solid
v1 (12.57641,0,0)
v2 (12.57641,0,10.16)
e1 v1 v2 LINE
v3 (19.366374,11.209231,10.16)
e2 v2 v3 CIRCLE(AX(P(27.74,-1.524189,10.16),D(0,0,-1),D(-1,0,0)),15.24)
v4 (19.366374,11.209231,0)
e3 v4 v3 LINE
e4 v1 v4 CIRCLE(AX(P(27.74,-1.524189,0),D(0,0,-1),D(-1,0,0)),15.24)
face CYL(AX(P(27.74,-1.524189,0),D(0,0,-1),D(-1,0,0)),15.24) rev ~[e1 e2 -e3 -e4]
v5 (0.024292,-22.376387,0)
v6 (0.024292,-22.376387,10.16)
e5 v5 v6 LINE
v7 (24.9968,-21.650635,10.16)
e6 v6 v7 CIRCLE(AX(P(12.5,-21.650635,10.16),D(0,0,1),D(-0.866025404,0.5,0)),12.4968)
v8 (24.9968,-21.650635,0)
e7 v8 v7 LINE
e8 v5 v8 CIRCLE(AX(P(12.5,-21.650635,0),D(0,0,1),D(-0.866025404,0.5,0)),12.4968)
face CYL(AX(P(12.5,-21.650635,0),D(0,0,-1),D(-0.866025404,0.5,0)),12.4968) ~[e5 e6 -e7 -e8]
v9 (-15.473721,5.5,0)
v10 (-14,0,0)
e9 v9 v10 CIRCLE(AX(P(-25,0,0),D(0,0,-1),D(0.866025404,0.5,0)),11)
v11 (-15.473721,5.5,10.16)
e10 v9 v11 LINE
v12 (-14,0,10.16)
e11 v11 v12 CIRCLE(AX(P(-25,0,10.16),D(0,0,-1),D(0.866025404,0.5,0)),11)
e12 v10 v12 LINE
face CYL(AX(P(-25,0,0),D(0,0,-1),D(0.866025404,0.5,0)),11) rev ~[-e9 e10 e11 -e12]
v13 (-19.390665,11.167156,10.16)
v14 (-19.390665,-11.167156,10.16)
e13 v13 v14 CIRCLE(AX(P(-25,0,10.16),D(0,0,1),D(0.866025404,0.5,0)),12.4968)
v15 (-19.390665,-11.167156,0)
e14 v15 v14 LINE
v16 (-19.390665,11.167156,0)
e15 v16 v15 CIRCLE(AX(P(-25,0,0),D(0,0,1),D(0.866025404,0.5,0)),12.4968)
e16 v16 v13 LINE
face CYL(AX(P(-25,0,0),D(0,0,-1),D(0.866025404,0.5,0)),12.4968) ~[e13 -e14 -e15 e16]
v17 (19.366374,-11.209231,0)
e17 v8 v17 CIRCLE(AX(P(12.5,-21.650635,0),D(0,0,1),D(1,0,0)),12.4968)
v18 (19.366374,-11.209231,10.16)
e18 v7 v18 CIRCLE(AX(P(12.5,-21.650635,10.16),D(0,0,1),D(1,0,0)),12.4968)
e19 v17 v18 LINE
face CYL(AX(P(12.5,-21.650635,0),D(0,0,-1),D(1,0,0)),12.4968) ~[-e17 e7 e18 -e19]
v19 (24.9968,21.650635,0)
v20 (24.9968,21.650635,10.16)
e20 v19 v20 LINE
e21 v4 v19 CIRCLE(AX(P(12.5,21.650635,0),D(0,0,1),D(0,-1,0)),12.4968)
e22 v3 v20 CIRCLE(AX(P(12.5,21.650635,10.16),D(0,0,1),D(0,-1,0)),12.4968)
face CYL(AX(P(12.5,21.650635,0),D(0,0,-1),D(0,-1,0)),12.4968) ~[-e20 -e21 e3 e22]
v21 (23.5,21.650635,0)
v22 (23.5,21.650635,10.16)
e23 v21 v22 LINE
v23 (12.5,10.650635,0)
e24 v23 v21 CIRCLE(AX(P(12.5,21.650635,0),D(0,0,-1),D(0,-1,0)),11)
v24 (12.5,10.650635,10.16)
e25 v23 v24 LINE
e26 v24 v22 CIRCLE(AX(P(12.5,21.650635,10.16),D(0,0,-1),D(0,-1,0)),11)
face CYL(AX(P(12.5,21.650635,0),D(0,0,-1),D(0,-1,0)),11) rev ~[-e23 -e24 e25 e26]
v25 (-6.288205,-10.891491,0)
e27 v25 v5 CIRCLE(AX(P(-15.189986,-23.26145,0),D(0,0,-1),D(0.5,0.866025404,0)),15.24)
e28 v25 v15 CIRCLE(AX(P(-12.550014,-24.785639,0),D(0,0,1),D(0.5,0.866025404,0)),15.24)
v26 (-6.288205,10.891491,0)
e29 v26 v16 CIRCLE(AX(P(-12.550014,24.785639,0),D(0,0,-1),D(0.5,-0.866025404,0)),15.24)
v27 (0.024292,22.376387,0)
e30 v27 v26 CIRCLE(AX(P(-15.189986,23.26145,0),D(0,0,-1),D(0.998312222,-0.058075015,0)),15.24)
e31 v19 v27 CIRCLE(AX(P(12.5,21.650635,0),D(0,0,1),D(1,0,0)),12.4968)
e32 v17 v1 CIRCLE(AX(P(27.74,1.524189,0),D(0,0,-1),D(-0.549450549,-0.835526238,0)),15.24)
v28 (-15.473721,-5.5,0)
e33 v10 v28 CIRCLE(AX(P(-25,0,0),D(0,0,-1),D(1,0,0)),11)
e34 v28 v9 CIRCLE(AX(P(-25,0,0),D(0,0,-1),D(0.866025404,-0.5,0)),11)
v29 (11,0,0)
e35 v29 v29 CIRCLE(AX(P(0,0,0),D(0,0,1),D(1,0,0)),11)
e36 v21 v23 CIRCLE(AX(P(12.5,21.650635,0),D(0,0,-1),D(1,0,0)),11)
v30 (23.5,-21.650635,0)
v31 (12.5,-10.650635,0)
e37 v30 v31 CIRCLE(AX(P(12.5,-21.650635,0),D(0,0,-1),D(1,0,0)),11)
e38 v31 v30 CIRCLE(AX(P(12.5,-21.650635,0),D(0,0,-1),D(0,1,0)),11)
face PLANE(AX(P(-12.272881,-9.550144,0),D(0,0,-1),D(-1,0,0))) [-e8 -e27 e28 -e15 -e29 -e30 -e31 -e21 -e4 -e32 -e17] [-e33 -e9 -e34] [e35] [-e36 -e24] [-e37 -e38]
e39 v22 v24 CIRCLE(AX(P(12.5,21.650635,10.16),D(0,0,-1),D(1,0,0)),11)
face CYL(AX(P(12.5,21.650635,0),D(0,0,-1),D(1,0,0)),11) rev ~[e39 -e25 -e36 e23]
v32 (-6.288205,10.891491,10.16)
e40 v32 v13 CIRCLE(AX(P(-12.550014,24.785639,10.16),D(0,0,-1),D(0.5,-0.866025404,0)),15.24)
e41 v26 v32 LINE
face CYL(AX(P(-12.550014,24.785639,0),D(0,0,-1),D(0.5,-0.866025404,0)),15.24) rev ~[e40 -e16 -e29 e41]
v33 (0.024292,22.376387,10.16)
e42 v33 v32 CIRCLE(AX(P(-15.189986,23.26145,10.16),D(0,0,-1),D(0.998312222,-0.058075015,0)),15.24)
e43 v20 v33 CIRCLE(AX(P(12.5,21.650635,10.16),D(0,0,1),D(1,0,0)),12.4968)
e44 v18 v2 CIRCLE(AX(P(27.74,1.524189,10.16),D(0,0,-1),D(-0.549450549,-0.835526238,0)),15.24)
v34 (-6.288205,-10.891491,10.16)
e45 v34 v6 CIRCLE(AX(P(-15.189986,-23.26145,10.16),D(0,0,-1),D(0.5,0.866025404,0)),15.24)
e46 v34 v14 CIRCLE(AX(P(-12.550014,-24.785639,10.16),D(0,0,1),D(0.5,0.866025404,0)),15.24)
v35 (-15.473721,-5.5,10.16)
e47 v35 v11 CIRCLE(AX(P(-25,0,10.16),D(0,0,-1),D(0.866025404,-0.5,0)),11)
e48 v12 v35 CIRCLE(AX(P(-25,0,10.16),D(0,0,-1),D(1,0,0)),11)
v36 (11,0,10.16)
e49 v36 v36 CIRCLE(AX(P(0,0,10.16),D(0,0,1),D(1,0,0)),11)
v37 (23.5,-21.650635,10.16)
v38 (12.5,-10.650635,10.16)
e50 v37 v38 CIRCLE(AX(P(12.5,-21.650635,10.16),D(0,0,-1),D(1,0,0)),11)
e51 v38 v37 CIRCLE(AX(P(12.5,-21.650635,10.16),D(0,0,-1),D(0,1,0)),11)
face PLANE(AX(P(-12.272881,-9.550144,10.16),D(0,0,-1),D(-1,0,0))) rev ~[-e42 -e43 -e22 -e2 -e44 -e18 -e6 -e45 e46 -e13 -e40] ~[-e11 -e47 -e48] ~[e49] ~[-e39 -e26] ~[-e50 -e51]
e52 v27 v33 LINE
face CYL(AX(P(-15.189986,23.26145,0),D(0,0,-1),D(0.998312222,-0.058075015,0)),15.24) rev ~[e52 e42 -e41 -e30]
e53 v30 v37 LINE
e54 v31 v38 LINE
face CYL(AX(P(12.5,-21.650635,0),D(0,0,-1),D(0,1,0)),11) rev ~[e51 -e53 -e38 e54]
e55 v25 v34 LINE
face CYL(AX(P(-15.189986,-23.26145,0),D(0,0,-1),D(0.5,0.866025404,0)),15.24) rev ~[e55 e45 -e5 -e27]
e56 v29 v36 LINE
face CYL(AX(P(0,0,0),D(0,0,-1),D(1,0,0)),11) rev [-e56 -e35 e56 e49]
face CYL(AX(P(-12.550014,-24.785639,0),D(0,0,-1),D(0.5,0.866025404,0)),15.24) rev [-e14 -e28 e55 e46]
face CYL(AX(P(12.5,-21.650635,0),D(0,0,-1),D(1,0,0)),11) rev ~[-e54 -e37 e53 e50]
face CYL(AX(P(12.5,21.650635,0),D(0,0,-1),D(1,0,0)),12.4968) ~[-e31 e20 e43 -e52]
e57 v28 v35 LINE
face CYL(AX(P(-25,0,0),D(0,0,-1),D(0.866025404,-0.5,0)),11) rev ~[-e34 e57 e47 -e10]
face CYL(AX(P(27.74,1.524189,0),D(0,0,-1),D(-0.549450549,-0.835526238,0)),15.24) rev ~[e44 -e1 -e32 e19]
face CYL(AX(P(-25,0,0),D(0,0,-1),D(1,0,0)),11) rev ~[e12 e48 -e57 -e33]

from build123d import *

# Parameters (mm, degrees)
F0_R        = 11
F1_DEPTH    = 10.16
F2_T1_DEPTH = 10.16


# Not quite as in the source:
# - a fillet or chamfer that OpenCascade refuses, or shapes differently, is made with other operations: its cross-section is extruded or revolved along the edge and cut away or added


with BuildPart() as f1:
    # F0 (on Top) → F1 (new body)
    with BuildSketch(Plane.XY):
        with BuildLine():
            ThreePointArc((-6.2500001721, -10.8253174479), (-12.5, 3.1e-08), (-6.2500001185, 10.8253174789))
            Line((-6.2500001185, 10.8253174789), (-14.177453734, 6.2484))
            ThreePointArc((-14.177453734, 6.2484), (-12.929018134, 3.2344098428), (-12.5032, 0))
            ThreePointArc((-12.5032, 0), (-12.929018134, -3.2344098428), (-14.177453734, -6.2484))
            Line((-14.177453734, -6.2484), (-6.2500001721, -10.8253174479))
        make_face()
        with BuildLine():
            Line((-15.4737205584, 5.5), (-14.177453734, 6.2484))
            ThreePointArc((-14.177453734, 6.2484), (-37.4968, 0), (-14.177453734, -6.2484))
            Line((-14.177453734, -6.2484), (-15.4737205584, -5.5))
            ThreePointArc((-15.4737205584, -5.5), (-36, 0), (-15.4737205584, 5.5))
        make_face()
        with BuildLine():
            Line((12.5, -9.1538350946), (12.5, 0))
            ThreePointArc((12.5, 0), (6.2499999139, -10.825317597), (-6.2500001721, -10.8253174479))
            Line((-6.2500001721, -10.8253174479), (1.677453734, -15.4022350946))
            ThreePointArc((1.677453734, -15.4022350946), (6.2516, -10.8280888286), (12.5, -9.1538350946))
        make_face()
        with BuildLine():
            ThreePointArc((24.9968, -21.6506350946), (21.3365720231, -12.8140630715), (12.5, -9.1538350946))
            Line((12.5, -9.1538350946), (12.5, -10.6506350946))
            ThreePointArc((12.5, -10.6506350946), (20.2781745931, -13.8724605016), (23.5, -21.6506350946))
            ThreePointArc((23.5, -21.6506350946), (9.6529905039, -32.2758191838), (2.9737205584, -16.1506350946))
            Line((2.9737205584, -16.1506350946), (1.677453734, -15.4022350946))
            ThreePointArc((1.677453734, -15.4022350946), (9.2655901572, -33.7216169606), (24.9968, -21.6506350946))
        make_face()
        with BuildLine():
            Line((12.5, -10.6506350946), (12.5, -9.1538350946))
            ThreePointArc((12.5, -9.1538350946), (6.2516, -10.8280888286), (1.677453734, -15.4022350946))
            Line((1.677453734, -15.4022350946), (2.9737205584, -16.1506350946))
            ThreePointArc((2.9737205584, -16.1506350946), (7, -12.124355653), (12.5, -10.6506350946))
        make_face()
        with BuildLine():
            ThreePointArc((-6.2500001721, -10.8253174479), (6.2499999139, -10.825317597), (12.5, 0))
            ThreePointArc((12.5, 0), (6.2499999408, 10.8253175815), (-6.2500001185, 10.8253174789))
            ThreePointArc((-6.2500001185, 10.8253174789), (-12.5, 3.1e-08), (-6.2500001721, -10.8253174479))
        make_face()
        Circle(F0_R, mode=Mode.SUBTRACT)
        with BuildLine():
            ThreePointArc((-6.2500001185, 10.8253174789), (6.2499999408, 10.8253175815), (12.5, 0))
            Line((12.5, 0), (12.5, 9.1538350946))
            ThreePointArc((12.5, 9.1538350946), (6.2516, 10.8280888286), (1.677453734, 15.4022350946))
            Line((1.677453734, 15.4022350946), (-6.2500001185, 10.8253174789))
        make_face()
        with BuildLine():
            ThreePointArc((1.677453734, 15.4022350946), (6.2516, 10.8280888286), (12.5, 9.1538350946))
            Line((12.5, 9.1538350946), (12.5, 10.6506350946))
            ThreePointArc((12.5, 10.6506350946), (7, 12.124355653), (2.9737205584, 16.1506350946))
            Line((2.9737205584, 16.1506350946), (1.677453734, 15.4022350946))
        make_face()
        with BuildLine():
            Line((12.5, 10.6506350946), (12.5, 9.1538350946))
            ThreePointArc((12.5, 9.1538350946), (21.3365720231, 12.8140630715), (24.9968, 21.6506350946))
            ThreePointArc((24.9968, 21.6506350946), (9.2655901572, 33.7216169606), (1.677453734, 15.4022350946))
            Line((1.677453734, 15.4022350946), (2.9737205584, 16.1506350946))
            ThreePointArc((2.9737205584, 16.1506350946), (9.6529905039, 32.2758191838), (23.5, 21.6506350946))
            ThreePointArc((23.5, 21.6506350946), (20.2781745931, 13.8724605016), (12.5, 10.6506350946))
        make_face()
        with BuildLine():
            ThreePointArc((-12.5032, 0), (-12.929018134, 3.2344098428), (-14.177453734, 6.2484))
            Line((-14.177453734, 6.2484), (-15.4737205584, 5.5))
            ThreePointArc((-15.4737205584, 5.5), (-14.3748159108, 2.8470094961), (-14, 0))
            ThreePointArc((-14, 0), (-14.3748159108, -2.8470094961), (-15.4737205584, -5.5))
            Line((-15.4737205584, -5.5), (-14.177453734, -6.2484))
            ThreePointArc((-14.177453734, -6.2484), (-12.929018134, -3.2344098428), (-12.5032, 0))
        make_face()
    extrude(amount=F1_DEPTH)

    # F2: fillet of radius 15.24 on 6 edges, made by hand

    # F2_s2 → F2_t1 (join)
    with BuildSketch(Plane.XY):
        with BuildLine():
            ThreePointArc((-4.9300135605, -11.5874120735), (-12.1072951031, -9.5520710185), (-19.3906654504, -11.1671561353))
            ThreePointArc((-19.3906654504, -11.1671561353), (-16.42385767, -9.0895430565), (-14.177453734, -6.2484))
            Line((-14.177453734, -6.2484), (-4.9300135605, -11.5874120735))
        make_face()
        with BuildLine():
            ThreePointArc((12.5, -1.5241890523), (14.3259837123, 5.7091896211), (19.3663736264, 11.2092308086))
            ThreePointArc((19.3663736264, 11.2092308086), (16.0837040307, 9.6787064421), (12.5, 9.1538350946))
            Line((12.5, 9.1538350946), (12.5, -1.5241890523))
        make_face()
        with BuildLine():
            ThreePointArc((19.3663736264, -11.2092308086), (14.3259837123, -5.7091896211), (12.5, 1.5241890523))
            Line((12.5, 1.5241890523), (12.5, -9.1538350946))
            ThreePointArc((12.5, -9.1538350946), (16.0837040307, -9.6787064421), (19.3663736264, -11.2092308086))
        make_face()
        with BuildLine():
            ThreePointArc((0.024291824, 22.3763869439), (-2.2186886092, 15.2612606396), (-7.5699864395, 10.0632230212))
            Line((-7.5699864395, 10.0632230212), (1.677453734, 15.4022350946))
            ThreePointArc((1.677453734, 15.4022350946), (0.3401536393, 18.7682494986), (0.024291824, 22.3763869439))
        make_face()
        with BuildLine():
            ThreePointArc((-4.9300135605, 11.5874120735), (-12.1072951031, 9.5520710185), (-19.3906654504, 11.1671561353))
            ThreePointArc((-19.3906654504, 11.1671561353), (-16.42385767, 9.0895430565), (-14.177453734, 6.2484))
            Line((-14.177453734, 6.2484), (-4.9300135605, 11.5874120735))
        make_face()
        with BuildLine():
            ThreePointArc((-7.5699864395, -10.0632230212), (-2.2186886092, -15.2612606396), (0.024291824, -22.3763869439))
            ThreePointArc((0.024291824, -22.3763869439), (0.3401536393, -18.7682494986), (1.677453734, -15.4022350946))
            Line((1.677453734, -15.4022350946), (-7.5699864395, -10.0632230212))
        make_face()
    extrude(amount=F2_T1_DEPTH)


solid = f1.part
